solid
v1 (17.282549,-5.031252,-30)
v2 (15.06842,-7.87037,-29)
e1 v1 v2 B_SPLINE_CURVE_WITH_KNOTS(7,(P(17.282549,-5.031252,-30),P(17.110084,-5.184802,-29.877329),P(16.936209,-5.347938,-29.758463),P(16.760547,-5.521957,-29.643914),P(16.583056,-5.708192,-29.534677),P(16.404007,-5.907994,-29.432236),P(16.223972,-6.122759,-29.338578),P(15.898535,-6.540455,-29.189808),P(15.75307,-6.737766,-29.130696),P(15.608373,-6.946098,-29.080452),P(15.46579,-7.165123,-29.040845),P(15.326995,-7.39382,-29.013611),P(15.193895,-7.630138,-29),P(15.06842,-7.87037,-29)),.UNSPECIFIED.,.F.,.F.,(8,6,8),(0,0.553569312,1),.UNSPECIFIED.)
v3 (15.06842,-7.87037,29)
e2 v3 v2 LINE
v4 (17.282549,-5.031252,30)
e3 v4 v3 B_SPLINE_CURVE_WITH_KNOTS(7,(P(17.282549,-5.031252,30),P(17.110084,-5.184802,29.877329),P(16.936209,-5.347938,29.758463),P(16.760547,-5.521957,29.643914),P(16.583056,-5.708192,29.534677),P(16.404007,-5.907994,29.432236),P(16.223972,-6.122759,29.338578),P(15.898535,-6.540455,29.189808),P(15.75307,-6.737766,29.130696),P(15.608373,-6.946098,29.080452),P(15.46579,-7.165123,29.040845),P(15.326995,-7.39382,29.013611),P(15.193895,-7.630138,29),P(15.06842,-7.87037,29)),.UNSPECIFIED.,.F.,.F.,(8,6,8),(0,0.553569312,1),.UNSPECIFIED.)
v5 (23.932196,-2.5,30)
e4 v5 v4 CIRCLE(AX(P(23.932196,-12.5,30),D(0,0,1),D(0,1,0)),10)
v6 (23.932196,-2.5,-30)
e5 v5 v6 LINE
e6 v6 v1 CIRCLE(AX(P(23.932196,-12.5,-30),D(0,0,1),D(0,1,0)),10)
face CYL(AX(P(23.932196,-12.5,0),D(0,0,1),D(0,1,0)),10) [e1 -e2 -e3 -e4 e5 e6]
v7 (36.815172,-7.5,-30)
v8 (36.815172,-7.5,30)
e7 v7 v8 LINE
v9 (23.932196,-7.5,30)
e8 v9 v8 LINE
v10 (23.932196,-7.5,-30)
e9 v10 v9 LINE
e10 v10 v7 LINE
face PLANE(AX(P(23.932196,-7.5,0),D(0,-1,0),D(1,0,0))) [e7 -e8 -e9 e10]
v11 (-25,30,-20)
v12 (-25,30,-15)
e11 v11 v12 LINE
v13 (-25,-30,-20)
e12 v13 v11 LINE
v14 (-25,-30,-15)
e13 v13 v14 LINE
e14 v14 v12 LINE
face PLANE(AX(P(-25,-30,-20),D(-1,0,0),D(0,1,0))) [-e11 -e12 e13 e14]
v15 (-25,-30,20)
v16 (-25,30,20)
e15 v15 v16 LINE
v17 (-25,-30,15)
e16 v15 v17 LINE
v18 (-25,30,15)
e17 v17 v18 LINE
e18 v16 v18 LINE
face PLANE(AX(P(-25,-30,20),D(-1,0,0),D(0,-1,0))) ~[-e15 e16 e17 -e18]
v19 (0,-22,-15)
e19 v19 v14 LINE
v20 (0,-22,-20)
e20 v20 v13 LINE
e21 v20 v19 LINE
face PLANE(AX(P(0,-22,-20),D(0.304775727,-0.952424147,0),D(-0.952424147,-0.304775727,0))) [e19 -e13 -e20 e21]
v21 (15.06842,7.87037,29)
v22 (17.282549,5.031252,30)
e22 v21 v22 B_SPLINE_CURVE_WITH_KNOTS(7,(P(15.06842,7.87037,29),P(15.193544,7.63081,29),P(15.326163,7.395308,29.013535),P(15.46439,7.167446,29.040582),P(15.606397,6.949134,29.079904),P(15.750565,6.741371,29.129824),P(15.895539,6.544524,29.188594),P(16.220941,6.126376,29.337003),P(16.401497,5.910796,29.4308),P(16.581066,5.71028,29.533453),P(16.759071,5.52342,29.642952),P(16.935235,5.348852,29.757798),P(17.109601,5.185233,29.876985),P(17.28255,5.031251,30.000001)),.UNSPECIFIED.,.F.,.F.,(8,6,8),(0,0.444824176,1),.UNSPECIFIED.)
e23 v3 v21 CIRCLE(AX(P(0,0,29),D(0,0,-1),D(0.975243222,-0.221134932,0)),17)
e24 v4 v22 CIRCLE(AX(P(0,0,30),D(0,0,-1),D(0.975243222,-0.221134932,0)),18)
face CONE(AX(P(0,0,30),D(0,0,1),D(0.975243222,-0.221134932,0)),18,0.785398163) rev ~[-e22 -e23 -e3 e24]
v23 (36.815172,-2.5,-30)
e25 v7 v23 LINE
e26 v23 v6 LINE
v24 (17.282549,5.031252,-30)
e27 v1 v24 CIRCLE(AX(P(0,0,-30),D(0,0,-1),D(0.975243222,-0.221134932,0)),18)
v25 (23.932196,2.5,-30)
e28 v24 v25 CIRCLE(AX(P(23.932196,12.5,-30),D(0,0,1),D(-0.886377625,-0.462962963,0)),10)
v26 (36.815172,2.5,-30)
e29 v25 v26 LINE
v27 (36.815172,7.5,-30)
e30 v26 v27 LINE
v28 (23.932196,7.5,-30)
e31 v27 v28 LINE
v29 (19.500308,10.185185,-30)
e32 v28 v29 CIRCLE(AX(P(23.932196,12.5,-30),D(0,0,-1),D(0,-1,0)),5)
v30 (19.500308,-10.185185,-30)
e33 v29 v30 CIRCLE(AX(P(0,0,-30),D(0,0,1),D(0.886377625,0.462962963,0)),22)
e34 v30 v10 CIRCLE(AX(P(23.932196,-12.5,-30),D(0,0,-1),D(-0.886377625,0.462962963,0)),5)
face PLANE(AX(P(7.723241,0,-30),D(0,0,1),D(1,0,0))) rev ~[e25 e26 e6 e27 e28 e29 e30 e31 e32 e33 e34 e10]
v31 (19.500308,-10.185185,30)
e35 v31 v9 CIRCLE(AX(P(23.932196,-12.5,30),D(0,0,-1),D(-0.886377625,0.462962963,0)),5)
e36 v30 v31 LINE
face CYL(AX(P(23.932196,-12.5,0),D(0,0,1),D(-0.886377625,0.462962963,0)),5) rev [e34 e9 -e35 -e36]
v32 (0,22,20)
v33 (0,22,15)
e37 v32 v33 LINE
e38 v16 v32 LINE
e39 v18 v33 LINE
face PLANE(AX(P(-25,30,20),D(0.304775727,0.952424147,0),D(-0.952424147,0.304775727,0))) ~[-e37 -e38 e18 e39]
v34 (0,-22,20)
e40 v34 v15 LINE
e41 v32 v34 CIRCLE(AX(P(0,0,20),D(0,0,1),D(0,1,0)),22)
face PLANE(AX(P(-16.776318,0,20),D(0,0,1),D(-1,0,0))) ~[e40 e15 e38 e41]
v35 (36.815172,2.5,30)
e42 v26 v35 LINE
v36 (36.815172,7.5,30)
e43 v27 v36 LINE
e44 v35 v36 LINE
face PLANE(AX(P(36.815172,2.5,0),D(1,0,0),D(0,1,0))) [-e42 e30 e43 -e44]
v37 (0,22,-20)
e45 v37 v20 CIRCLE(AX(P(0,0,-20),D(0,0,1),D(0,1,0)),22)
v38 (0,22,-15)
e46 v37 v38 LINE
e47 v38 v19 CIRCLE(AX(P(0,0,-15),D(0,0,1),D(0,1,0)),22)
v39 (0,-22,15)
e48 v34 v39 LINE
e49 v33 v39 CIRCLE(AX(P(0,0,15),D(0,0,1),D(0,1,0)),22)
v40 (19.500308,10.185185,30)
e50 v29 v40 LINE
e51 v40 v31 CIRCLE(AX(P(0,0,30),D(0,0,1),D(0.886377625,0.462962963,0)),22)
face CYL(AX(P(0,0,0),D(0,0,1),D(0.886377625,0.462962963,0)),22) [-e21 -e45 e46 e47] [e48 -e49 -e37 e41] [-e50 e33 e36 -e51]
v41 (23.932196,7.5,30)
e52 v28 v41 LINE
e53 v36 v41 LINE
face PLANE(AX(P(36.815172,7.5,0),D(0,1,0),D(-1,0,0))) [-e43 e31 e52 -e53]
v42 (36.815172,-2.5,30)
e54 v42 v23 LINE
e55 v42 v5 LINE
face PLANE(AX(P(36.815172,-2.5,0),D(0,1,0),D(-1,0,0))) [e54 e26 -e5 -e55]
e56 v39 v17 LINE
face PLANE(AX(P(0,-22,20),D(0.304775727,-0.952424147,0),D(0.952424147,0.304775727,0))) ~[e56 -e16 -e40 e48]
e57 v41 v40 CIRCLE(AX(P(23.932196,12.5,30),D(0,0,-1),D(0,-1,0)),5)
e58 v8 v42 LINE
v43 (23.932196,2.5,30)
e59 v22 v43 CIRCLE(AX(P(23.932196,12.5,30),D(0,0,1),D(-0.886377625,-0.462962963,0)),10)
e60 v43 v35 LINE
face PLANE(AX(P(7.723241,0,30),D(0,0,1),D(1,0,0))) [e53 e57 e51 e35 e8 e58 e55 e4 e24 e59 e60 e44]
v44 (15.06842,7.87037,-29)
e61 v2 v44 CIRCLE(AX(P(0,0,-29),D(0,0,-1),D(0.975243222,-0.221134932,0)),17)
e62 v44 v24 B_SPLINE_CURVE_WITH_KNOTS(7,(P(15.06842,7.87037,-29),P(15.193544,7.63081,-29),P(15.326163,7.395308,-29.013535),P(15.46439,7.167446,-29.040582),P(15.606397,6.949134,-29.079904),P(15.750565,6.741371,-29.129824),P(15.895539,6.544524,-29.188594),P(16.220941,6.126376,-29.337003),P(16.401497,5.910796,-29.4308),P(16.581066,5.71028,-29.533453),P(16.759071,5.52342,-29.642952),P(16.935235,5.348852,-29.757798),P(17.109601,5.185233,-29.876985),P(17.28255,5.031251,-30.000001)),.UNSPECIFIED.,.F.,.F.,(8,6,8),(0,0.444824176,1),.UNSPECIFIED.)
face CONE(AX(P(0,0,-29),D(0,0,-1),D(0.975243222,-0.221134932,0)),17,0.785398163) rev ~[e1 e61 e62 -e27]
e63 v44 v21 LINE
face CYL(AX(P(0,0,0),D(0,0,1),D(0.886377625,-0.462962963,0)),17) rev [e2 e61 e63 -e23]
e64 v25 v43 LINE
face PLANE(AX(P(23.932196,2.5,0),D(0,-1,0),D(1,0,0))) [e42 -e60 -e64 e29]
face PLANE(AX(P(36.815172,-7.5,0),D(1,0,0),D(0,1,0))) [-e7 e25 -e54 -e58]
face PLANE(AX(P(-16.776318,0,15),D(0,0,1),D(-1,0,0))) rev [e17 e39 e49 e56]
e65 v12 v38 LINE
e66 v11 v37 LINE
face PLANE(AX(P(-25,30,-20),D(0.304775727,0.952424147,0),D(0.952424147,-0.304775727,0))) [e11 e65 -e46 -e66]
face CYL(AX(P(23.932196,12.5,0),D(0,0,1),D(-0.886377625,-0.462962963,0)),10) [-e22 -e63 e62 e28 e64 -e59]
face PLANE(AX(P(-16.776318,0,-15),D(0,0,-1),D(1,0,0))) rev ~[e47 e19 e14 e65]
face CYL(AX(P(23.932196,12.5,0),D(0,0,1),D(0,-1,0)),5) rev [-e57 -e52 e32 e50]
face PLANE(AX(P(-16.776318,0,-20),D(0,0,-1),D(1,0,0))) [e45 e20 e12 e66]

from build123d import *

# Parameters (mm, degrees)
F1_DEPTH    = 30
F2_T2_ANGLE = 334.4485965255
F2_T4_ANGLE = 334.4485965255
F4_START    = -10
F4_DEPTH    = 5


# Not quite as in the source:
# - a fillet or chamfer that OpenCascade refuses, or shapes differently, is made with other operations: its cross-section is extruded or revolved along the edge and cut away or added


with BuildPart() as f1:
    # F0 (on Top) → F1 (new body, symmetric)
    with BuildSketch(Plane.XY):
        with BuildLine():
            ThreePointArc((15.0684196329, -7.8703703704), (-17, 0), (15.0684196329, 7.8703703704))
            ThreePointArc((15.0684196329, 7.8703703704), (18.7503186358, 3.9473309343), (23.9321958875, 2.5))
            Line((23.9321958875, 2.5), (36.8151717208, 2.5))
            Line((36.8151717208, 2.5), (36.8151717208, 7.5))
            Line((36.8151717208, 7.5), (23.9321958875, 7.5))
            ThreePointArc((23.9321958875, 7.5), (21.3412572617, 8.2236654671), (19.5003077602, 10.1851851852))
            ThreePointArc((19.5003077602, 10.1851851852), (-22, 0), (19.5003077602, -10.1851851852))
            ThreePointArc((19.5003077602, -10.1851851852), (21.3412572617, -8.2236654671), (23.9321958875, -7.5))
            Line((23.9321958875, -7.5), (36.8151717208, -7.5))
            Line((36.8151717208, -7.5), (36.8151717208, -2.5))
            Line((36.8151717208, -2.5), (23.9321958875, -2.5))
            ThreePointArc((23.9321958875, -2.5), (18.7503186358, -3.9473309343), (15.0684196329, -7.8703703704))
        make_face()
    extrude(amount=F1_DEPTH, both=True)

    # F2: chamfer of 1 on 2 edges, made by hand

    # F2_s1 → F2_t2 (revolve, cut)
    with BuildSketch(Plane(origin=(0, 0, 0), x_dir=(0, 0, 1), z_dir=(0.2211349318, 0.9752432219, 0))):
        Polygon((30, 18), (29, 17), (30, 17), align=None)
    revolve(axis=Axis((0, 0, 30), (0, 0, -1)), revolution_arc=F2_T2_ANGLE, mode=Mode.SUBTRACT)

    # F2_s3 → F2_t4 (revolve, cut)
    with BuildSketch(Plane(origin=(0, 0, 0), x_dir=(0, 0, 1), z_dir=(0.2211349318, 0.9752432219, 0))):
        Polygon((-29, 17), (-30, 18), (-30, 17), align=None)
    revolve(axis=Axis((0, 0, -30), (0, 0, -1)), revolution_arc=F2_T4_ANGLE, mode=Mode.SUBTRACT)

    # F3 (on face) → F4 (join)
    with BuildSketch(Plane(origin=(0, 0, -30), x_dir=(1, 0, 0), z_dir=(0, 0, -1)).offset(F4_START)):
        with BuildLine():
            ThreePointArc((0, -22), (-22, 0), (0, 22))
            Line((0, 22), (-25, 30))
            Line((-25, 30), (-25, -30))
            Line((-25, -30), (0, -22))
        make_face()
    extrude(amount=-F4_DEPTH)

    # F5: F1 across plane


with BuildPart() as f1_1:
    add(f1.part)
    add(f1.part.mirror(Plane.XY))


solid = f1_1.part
